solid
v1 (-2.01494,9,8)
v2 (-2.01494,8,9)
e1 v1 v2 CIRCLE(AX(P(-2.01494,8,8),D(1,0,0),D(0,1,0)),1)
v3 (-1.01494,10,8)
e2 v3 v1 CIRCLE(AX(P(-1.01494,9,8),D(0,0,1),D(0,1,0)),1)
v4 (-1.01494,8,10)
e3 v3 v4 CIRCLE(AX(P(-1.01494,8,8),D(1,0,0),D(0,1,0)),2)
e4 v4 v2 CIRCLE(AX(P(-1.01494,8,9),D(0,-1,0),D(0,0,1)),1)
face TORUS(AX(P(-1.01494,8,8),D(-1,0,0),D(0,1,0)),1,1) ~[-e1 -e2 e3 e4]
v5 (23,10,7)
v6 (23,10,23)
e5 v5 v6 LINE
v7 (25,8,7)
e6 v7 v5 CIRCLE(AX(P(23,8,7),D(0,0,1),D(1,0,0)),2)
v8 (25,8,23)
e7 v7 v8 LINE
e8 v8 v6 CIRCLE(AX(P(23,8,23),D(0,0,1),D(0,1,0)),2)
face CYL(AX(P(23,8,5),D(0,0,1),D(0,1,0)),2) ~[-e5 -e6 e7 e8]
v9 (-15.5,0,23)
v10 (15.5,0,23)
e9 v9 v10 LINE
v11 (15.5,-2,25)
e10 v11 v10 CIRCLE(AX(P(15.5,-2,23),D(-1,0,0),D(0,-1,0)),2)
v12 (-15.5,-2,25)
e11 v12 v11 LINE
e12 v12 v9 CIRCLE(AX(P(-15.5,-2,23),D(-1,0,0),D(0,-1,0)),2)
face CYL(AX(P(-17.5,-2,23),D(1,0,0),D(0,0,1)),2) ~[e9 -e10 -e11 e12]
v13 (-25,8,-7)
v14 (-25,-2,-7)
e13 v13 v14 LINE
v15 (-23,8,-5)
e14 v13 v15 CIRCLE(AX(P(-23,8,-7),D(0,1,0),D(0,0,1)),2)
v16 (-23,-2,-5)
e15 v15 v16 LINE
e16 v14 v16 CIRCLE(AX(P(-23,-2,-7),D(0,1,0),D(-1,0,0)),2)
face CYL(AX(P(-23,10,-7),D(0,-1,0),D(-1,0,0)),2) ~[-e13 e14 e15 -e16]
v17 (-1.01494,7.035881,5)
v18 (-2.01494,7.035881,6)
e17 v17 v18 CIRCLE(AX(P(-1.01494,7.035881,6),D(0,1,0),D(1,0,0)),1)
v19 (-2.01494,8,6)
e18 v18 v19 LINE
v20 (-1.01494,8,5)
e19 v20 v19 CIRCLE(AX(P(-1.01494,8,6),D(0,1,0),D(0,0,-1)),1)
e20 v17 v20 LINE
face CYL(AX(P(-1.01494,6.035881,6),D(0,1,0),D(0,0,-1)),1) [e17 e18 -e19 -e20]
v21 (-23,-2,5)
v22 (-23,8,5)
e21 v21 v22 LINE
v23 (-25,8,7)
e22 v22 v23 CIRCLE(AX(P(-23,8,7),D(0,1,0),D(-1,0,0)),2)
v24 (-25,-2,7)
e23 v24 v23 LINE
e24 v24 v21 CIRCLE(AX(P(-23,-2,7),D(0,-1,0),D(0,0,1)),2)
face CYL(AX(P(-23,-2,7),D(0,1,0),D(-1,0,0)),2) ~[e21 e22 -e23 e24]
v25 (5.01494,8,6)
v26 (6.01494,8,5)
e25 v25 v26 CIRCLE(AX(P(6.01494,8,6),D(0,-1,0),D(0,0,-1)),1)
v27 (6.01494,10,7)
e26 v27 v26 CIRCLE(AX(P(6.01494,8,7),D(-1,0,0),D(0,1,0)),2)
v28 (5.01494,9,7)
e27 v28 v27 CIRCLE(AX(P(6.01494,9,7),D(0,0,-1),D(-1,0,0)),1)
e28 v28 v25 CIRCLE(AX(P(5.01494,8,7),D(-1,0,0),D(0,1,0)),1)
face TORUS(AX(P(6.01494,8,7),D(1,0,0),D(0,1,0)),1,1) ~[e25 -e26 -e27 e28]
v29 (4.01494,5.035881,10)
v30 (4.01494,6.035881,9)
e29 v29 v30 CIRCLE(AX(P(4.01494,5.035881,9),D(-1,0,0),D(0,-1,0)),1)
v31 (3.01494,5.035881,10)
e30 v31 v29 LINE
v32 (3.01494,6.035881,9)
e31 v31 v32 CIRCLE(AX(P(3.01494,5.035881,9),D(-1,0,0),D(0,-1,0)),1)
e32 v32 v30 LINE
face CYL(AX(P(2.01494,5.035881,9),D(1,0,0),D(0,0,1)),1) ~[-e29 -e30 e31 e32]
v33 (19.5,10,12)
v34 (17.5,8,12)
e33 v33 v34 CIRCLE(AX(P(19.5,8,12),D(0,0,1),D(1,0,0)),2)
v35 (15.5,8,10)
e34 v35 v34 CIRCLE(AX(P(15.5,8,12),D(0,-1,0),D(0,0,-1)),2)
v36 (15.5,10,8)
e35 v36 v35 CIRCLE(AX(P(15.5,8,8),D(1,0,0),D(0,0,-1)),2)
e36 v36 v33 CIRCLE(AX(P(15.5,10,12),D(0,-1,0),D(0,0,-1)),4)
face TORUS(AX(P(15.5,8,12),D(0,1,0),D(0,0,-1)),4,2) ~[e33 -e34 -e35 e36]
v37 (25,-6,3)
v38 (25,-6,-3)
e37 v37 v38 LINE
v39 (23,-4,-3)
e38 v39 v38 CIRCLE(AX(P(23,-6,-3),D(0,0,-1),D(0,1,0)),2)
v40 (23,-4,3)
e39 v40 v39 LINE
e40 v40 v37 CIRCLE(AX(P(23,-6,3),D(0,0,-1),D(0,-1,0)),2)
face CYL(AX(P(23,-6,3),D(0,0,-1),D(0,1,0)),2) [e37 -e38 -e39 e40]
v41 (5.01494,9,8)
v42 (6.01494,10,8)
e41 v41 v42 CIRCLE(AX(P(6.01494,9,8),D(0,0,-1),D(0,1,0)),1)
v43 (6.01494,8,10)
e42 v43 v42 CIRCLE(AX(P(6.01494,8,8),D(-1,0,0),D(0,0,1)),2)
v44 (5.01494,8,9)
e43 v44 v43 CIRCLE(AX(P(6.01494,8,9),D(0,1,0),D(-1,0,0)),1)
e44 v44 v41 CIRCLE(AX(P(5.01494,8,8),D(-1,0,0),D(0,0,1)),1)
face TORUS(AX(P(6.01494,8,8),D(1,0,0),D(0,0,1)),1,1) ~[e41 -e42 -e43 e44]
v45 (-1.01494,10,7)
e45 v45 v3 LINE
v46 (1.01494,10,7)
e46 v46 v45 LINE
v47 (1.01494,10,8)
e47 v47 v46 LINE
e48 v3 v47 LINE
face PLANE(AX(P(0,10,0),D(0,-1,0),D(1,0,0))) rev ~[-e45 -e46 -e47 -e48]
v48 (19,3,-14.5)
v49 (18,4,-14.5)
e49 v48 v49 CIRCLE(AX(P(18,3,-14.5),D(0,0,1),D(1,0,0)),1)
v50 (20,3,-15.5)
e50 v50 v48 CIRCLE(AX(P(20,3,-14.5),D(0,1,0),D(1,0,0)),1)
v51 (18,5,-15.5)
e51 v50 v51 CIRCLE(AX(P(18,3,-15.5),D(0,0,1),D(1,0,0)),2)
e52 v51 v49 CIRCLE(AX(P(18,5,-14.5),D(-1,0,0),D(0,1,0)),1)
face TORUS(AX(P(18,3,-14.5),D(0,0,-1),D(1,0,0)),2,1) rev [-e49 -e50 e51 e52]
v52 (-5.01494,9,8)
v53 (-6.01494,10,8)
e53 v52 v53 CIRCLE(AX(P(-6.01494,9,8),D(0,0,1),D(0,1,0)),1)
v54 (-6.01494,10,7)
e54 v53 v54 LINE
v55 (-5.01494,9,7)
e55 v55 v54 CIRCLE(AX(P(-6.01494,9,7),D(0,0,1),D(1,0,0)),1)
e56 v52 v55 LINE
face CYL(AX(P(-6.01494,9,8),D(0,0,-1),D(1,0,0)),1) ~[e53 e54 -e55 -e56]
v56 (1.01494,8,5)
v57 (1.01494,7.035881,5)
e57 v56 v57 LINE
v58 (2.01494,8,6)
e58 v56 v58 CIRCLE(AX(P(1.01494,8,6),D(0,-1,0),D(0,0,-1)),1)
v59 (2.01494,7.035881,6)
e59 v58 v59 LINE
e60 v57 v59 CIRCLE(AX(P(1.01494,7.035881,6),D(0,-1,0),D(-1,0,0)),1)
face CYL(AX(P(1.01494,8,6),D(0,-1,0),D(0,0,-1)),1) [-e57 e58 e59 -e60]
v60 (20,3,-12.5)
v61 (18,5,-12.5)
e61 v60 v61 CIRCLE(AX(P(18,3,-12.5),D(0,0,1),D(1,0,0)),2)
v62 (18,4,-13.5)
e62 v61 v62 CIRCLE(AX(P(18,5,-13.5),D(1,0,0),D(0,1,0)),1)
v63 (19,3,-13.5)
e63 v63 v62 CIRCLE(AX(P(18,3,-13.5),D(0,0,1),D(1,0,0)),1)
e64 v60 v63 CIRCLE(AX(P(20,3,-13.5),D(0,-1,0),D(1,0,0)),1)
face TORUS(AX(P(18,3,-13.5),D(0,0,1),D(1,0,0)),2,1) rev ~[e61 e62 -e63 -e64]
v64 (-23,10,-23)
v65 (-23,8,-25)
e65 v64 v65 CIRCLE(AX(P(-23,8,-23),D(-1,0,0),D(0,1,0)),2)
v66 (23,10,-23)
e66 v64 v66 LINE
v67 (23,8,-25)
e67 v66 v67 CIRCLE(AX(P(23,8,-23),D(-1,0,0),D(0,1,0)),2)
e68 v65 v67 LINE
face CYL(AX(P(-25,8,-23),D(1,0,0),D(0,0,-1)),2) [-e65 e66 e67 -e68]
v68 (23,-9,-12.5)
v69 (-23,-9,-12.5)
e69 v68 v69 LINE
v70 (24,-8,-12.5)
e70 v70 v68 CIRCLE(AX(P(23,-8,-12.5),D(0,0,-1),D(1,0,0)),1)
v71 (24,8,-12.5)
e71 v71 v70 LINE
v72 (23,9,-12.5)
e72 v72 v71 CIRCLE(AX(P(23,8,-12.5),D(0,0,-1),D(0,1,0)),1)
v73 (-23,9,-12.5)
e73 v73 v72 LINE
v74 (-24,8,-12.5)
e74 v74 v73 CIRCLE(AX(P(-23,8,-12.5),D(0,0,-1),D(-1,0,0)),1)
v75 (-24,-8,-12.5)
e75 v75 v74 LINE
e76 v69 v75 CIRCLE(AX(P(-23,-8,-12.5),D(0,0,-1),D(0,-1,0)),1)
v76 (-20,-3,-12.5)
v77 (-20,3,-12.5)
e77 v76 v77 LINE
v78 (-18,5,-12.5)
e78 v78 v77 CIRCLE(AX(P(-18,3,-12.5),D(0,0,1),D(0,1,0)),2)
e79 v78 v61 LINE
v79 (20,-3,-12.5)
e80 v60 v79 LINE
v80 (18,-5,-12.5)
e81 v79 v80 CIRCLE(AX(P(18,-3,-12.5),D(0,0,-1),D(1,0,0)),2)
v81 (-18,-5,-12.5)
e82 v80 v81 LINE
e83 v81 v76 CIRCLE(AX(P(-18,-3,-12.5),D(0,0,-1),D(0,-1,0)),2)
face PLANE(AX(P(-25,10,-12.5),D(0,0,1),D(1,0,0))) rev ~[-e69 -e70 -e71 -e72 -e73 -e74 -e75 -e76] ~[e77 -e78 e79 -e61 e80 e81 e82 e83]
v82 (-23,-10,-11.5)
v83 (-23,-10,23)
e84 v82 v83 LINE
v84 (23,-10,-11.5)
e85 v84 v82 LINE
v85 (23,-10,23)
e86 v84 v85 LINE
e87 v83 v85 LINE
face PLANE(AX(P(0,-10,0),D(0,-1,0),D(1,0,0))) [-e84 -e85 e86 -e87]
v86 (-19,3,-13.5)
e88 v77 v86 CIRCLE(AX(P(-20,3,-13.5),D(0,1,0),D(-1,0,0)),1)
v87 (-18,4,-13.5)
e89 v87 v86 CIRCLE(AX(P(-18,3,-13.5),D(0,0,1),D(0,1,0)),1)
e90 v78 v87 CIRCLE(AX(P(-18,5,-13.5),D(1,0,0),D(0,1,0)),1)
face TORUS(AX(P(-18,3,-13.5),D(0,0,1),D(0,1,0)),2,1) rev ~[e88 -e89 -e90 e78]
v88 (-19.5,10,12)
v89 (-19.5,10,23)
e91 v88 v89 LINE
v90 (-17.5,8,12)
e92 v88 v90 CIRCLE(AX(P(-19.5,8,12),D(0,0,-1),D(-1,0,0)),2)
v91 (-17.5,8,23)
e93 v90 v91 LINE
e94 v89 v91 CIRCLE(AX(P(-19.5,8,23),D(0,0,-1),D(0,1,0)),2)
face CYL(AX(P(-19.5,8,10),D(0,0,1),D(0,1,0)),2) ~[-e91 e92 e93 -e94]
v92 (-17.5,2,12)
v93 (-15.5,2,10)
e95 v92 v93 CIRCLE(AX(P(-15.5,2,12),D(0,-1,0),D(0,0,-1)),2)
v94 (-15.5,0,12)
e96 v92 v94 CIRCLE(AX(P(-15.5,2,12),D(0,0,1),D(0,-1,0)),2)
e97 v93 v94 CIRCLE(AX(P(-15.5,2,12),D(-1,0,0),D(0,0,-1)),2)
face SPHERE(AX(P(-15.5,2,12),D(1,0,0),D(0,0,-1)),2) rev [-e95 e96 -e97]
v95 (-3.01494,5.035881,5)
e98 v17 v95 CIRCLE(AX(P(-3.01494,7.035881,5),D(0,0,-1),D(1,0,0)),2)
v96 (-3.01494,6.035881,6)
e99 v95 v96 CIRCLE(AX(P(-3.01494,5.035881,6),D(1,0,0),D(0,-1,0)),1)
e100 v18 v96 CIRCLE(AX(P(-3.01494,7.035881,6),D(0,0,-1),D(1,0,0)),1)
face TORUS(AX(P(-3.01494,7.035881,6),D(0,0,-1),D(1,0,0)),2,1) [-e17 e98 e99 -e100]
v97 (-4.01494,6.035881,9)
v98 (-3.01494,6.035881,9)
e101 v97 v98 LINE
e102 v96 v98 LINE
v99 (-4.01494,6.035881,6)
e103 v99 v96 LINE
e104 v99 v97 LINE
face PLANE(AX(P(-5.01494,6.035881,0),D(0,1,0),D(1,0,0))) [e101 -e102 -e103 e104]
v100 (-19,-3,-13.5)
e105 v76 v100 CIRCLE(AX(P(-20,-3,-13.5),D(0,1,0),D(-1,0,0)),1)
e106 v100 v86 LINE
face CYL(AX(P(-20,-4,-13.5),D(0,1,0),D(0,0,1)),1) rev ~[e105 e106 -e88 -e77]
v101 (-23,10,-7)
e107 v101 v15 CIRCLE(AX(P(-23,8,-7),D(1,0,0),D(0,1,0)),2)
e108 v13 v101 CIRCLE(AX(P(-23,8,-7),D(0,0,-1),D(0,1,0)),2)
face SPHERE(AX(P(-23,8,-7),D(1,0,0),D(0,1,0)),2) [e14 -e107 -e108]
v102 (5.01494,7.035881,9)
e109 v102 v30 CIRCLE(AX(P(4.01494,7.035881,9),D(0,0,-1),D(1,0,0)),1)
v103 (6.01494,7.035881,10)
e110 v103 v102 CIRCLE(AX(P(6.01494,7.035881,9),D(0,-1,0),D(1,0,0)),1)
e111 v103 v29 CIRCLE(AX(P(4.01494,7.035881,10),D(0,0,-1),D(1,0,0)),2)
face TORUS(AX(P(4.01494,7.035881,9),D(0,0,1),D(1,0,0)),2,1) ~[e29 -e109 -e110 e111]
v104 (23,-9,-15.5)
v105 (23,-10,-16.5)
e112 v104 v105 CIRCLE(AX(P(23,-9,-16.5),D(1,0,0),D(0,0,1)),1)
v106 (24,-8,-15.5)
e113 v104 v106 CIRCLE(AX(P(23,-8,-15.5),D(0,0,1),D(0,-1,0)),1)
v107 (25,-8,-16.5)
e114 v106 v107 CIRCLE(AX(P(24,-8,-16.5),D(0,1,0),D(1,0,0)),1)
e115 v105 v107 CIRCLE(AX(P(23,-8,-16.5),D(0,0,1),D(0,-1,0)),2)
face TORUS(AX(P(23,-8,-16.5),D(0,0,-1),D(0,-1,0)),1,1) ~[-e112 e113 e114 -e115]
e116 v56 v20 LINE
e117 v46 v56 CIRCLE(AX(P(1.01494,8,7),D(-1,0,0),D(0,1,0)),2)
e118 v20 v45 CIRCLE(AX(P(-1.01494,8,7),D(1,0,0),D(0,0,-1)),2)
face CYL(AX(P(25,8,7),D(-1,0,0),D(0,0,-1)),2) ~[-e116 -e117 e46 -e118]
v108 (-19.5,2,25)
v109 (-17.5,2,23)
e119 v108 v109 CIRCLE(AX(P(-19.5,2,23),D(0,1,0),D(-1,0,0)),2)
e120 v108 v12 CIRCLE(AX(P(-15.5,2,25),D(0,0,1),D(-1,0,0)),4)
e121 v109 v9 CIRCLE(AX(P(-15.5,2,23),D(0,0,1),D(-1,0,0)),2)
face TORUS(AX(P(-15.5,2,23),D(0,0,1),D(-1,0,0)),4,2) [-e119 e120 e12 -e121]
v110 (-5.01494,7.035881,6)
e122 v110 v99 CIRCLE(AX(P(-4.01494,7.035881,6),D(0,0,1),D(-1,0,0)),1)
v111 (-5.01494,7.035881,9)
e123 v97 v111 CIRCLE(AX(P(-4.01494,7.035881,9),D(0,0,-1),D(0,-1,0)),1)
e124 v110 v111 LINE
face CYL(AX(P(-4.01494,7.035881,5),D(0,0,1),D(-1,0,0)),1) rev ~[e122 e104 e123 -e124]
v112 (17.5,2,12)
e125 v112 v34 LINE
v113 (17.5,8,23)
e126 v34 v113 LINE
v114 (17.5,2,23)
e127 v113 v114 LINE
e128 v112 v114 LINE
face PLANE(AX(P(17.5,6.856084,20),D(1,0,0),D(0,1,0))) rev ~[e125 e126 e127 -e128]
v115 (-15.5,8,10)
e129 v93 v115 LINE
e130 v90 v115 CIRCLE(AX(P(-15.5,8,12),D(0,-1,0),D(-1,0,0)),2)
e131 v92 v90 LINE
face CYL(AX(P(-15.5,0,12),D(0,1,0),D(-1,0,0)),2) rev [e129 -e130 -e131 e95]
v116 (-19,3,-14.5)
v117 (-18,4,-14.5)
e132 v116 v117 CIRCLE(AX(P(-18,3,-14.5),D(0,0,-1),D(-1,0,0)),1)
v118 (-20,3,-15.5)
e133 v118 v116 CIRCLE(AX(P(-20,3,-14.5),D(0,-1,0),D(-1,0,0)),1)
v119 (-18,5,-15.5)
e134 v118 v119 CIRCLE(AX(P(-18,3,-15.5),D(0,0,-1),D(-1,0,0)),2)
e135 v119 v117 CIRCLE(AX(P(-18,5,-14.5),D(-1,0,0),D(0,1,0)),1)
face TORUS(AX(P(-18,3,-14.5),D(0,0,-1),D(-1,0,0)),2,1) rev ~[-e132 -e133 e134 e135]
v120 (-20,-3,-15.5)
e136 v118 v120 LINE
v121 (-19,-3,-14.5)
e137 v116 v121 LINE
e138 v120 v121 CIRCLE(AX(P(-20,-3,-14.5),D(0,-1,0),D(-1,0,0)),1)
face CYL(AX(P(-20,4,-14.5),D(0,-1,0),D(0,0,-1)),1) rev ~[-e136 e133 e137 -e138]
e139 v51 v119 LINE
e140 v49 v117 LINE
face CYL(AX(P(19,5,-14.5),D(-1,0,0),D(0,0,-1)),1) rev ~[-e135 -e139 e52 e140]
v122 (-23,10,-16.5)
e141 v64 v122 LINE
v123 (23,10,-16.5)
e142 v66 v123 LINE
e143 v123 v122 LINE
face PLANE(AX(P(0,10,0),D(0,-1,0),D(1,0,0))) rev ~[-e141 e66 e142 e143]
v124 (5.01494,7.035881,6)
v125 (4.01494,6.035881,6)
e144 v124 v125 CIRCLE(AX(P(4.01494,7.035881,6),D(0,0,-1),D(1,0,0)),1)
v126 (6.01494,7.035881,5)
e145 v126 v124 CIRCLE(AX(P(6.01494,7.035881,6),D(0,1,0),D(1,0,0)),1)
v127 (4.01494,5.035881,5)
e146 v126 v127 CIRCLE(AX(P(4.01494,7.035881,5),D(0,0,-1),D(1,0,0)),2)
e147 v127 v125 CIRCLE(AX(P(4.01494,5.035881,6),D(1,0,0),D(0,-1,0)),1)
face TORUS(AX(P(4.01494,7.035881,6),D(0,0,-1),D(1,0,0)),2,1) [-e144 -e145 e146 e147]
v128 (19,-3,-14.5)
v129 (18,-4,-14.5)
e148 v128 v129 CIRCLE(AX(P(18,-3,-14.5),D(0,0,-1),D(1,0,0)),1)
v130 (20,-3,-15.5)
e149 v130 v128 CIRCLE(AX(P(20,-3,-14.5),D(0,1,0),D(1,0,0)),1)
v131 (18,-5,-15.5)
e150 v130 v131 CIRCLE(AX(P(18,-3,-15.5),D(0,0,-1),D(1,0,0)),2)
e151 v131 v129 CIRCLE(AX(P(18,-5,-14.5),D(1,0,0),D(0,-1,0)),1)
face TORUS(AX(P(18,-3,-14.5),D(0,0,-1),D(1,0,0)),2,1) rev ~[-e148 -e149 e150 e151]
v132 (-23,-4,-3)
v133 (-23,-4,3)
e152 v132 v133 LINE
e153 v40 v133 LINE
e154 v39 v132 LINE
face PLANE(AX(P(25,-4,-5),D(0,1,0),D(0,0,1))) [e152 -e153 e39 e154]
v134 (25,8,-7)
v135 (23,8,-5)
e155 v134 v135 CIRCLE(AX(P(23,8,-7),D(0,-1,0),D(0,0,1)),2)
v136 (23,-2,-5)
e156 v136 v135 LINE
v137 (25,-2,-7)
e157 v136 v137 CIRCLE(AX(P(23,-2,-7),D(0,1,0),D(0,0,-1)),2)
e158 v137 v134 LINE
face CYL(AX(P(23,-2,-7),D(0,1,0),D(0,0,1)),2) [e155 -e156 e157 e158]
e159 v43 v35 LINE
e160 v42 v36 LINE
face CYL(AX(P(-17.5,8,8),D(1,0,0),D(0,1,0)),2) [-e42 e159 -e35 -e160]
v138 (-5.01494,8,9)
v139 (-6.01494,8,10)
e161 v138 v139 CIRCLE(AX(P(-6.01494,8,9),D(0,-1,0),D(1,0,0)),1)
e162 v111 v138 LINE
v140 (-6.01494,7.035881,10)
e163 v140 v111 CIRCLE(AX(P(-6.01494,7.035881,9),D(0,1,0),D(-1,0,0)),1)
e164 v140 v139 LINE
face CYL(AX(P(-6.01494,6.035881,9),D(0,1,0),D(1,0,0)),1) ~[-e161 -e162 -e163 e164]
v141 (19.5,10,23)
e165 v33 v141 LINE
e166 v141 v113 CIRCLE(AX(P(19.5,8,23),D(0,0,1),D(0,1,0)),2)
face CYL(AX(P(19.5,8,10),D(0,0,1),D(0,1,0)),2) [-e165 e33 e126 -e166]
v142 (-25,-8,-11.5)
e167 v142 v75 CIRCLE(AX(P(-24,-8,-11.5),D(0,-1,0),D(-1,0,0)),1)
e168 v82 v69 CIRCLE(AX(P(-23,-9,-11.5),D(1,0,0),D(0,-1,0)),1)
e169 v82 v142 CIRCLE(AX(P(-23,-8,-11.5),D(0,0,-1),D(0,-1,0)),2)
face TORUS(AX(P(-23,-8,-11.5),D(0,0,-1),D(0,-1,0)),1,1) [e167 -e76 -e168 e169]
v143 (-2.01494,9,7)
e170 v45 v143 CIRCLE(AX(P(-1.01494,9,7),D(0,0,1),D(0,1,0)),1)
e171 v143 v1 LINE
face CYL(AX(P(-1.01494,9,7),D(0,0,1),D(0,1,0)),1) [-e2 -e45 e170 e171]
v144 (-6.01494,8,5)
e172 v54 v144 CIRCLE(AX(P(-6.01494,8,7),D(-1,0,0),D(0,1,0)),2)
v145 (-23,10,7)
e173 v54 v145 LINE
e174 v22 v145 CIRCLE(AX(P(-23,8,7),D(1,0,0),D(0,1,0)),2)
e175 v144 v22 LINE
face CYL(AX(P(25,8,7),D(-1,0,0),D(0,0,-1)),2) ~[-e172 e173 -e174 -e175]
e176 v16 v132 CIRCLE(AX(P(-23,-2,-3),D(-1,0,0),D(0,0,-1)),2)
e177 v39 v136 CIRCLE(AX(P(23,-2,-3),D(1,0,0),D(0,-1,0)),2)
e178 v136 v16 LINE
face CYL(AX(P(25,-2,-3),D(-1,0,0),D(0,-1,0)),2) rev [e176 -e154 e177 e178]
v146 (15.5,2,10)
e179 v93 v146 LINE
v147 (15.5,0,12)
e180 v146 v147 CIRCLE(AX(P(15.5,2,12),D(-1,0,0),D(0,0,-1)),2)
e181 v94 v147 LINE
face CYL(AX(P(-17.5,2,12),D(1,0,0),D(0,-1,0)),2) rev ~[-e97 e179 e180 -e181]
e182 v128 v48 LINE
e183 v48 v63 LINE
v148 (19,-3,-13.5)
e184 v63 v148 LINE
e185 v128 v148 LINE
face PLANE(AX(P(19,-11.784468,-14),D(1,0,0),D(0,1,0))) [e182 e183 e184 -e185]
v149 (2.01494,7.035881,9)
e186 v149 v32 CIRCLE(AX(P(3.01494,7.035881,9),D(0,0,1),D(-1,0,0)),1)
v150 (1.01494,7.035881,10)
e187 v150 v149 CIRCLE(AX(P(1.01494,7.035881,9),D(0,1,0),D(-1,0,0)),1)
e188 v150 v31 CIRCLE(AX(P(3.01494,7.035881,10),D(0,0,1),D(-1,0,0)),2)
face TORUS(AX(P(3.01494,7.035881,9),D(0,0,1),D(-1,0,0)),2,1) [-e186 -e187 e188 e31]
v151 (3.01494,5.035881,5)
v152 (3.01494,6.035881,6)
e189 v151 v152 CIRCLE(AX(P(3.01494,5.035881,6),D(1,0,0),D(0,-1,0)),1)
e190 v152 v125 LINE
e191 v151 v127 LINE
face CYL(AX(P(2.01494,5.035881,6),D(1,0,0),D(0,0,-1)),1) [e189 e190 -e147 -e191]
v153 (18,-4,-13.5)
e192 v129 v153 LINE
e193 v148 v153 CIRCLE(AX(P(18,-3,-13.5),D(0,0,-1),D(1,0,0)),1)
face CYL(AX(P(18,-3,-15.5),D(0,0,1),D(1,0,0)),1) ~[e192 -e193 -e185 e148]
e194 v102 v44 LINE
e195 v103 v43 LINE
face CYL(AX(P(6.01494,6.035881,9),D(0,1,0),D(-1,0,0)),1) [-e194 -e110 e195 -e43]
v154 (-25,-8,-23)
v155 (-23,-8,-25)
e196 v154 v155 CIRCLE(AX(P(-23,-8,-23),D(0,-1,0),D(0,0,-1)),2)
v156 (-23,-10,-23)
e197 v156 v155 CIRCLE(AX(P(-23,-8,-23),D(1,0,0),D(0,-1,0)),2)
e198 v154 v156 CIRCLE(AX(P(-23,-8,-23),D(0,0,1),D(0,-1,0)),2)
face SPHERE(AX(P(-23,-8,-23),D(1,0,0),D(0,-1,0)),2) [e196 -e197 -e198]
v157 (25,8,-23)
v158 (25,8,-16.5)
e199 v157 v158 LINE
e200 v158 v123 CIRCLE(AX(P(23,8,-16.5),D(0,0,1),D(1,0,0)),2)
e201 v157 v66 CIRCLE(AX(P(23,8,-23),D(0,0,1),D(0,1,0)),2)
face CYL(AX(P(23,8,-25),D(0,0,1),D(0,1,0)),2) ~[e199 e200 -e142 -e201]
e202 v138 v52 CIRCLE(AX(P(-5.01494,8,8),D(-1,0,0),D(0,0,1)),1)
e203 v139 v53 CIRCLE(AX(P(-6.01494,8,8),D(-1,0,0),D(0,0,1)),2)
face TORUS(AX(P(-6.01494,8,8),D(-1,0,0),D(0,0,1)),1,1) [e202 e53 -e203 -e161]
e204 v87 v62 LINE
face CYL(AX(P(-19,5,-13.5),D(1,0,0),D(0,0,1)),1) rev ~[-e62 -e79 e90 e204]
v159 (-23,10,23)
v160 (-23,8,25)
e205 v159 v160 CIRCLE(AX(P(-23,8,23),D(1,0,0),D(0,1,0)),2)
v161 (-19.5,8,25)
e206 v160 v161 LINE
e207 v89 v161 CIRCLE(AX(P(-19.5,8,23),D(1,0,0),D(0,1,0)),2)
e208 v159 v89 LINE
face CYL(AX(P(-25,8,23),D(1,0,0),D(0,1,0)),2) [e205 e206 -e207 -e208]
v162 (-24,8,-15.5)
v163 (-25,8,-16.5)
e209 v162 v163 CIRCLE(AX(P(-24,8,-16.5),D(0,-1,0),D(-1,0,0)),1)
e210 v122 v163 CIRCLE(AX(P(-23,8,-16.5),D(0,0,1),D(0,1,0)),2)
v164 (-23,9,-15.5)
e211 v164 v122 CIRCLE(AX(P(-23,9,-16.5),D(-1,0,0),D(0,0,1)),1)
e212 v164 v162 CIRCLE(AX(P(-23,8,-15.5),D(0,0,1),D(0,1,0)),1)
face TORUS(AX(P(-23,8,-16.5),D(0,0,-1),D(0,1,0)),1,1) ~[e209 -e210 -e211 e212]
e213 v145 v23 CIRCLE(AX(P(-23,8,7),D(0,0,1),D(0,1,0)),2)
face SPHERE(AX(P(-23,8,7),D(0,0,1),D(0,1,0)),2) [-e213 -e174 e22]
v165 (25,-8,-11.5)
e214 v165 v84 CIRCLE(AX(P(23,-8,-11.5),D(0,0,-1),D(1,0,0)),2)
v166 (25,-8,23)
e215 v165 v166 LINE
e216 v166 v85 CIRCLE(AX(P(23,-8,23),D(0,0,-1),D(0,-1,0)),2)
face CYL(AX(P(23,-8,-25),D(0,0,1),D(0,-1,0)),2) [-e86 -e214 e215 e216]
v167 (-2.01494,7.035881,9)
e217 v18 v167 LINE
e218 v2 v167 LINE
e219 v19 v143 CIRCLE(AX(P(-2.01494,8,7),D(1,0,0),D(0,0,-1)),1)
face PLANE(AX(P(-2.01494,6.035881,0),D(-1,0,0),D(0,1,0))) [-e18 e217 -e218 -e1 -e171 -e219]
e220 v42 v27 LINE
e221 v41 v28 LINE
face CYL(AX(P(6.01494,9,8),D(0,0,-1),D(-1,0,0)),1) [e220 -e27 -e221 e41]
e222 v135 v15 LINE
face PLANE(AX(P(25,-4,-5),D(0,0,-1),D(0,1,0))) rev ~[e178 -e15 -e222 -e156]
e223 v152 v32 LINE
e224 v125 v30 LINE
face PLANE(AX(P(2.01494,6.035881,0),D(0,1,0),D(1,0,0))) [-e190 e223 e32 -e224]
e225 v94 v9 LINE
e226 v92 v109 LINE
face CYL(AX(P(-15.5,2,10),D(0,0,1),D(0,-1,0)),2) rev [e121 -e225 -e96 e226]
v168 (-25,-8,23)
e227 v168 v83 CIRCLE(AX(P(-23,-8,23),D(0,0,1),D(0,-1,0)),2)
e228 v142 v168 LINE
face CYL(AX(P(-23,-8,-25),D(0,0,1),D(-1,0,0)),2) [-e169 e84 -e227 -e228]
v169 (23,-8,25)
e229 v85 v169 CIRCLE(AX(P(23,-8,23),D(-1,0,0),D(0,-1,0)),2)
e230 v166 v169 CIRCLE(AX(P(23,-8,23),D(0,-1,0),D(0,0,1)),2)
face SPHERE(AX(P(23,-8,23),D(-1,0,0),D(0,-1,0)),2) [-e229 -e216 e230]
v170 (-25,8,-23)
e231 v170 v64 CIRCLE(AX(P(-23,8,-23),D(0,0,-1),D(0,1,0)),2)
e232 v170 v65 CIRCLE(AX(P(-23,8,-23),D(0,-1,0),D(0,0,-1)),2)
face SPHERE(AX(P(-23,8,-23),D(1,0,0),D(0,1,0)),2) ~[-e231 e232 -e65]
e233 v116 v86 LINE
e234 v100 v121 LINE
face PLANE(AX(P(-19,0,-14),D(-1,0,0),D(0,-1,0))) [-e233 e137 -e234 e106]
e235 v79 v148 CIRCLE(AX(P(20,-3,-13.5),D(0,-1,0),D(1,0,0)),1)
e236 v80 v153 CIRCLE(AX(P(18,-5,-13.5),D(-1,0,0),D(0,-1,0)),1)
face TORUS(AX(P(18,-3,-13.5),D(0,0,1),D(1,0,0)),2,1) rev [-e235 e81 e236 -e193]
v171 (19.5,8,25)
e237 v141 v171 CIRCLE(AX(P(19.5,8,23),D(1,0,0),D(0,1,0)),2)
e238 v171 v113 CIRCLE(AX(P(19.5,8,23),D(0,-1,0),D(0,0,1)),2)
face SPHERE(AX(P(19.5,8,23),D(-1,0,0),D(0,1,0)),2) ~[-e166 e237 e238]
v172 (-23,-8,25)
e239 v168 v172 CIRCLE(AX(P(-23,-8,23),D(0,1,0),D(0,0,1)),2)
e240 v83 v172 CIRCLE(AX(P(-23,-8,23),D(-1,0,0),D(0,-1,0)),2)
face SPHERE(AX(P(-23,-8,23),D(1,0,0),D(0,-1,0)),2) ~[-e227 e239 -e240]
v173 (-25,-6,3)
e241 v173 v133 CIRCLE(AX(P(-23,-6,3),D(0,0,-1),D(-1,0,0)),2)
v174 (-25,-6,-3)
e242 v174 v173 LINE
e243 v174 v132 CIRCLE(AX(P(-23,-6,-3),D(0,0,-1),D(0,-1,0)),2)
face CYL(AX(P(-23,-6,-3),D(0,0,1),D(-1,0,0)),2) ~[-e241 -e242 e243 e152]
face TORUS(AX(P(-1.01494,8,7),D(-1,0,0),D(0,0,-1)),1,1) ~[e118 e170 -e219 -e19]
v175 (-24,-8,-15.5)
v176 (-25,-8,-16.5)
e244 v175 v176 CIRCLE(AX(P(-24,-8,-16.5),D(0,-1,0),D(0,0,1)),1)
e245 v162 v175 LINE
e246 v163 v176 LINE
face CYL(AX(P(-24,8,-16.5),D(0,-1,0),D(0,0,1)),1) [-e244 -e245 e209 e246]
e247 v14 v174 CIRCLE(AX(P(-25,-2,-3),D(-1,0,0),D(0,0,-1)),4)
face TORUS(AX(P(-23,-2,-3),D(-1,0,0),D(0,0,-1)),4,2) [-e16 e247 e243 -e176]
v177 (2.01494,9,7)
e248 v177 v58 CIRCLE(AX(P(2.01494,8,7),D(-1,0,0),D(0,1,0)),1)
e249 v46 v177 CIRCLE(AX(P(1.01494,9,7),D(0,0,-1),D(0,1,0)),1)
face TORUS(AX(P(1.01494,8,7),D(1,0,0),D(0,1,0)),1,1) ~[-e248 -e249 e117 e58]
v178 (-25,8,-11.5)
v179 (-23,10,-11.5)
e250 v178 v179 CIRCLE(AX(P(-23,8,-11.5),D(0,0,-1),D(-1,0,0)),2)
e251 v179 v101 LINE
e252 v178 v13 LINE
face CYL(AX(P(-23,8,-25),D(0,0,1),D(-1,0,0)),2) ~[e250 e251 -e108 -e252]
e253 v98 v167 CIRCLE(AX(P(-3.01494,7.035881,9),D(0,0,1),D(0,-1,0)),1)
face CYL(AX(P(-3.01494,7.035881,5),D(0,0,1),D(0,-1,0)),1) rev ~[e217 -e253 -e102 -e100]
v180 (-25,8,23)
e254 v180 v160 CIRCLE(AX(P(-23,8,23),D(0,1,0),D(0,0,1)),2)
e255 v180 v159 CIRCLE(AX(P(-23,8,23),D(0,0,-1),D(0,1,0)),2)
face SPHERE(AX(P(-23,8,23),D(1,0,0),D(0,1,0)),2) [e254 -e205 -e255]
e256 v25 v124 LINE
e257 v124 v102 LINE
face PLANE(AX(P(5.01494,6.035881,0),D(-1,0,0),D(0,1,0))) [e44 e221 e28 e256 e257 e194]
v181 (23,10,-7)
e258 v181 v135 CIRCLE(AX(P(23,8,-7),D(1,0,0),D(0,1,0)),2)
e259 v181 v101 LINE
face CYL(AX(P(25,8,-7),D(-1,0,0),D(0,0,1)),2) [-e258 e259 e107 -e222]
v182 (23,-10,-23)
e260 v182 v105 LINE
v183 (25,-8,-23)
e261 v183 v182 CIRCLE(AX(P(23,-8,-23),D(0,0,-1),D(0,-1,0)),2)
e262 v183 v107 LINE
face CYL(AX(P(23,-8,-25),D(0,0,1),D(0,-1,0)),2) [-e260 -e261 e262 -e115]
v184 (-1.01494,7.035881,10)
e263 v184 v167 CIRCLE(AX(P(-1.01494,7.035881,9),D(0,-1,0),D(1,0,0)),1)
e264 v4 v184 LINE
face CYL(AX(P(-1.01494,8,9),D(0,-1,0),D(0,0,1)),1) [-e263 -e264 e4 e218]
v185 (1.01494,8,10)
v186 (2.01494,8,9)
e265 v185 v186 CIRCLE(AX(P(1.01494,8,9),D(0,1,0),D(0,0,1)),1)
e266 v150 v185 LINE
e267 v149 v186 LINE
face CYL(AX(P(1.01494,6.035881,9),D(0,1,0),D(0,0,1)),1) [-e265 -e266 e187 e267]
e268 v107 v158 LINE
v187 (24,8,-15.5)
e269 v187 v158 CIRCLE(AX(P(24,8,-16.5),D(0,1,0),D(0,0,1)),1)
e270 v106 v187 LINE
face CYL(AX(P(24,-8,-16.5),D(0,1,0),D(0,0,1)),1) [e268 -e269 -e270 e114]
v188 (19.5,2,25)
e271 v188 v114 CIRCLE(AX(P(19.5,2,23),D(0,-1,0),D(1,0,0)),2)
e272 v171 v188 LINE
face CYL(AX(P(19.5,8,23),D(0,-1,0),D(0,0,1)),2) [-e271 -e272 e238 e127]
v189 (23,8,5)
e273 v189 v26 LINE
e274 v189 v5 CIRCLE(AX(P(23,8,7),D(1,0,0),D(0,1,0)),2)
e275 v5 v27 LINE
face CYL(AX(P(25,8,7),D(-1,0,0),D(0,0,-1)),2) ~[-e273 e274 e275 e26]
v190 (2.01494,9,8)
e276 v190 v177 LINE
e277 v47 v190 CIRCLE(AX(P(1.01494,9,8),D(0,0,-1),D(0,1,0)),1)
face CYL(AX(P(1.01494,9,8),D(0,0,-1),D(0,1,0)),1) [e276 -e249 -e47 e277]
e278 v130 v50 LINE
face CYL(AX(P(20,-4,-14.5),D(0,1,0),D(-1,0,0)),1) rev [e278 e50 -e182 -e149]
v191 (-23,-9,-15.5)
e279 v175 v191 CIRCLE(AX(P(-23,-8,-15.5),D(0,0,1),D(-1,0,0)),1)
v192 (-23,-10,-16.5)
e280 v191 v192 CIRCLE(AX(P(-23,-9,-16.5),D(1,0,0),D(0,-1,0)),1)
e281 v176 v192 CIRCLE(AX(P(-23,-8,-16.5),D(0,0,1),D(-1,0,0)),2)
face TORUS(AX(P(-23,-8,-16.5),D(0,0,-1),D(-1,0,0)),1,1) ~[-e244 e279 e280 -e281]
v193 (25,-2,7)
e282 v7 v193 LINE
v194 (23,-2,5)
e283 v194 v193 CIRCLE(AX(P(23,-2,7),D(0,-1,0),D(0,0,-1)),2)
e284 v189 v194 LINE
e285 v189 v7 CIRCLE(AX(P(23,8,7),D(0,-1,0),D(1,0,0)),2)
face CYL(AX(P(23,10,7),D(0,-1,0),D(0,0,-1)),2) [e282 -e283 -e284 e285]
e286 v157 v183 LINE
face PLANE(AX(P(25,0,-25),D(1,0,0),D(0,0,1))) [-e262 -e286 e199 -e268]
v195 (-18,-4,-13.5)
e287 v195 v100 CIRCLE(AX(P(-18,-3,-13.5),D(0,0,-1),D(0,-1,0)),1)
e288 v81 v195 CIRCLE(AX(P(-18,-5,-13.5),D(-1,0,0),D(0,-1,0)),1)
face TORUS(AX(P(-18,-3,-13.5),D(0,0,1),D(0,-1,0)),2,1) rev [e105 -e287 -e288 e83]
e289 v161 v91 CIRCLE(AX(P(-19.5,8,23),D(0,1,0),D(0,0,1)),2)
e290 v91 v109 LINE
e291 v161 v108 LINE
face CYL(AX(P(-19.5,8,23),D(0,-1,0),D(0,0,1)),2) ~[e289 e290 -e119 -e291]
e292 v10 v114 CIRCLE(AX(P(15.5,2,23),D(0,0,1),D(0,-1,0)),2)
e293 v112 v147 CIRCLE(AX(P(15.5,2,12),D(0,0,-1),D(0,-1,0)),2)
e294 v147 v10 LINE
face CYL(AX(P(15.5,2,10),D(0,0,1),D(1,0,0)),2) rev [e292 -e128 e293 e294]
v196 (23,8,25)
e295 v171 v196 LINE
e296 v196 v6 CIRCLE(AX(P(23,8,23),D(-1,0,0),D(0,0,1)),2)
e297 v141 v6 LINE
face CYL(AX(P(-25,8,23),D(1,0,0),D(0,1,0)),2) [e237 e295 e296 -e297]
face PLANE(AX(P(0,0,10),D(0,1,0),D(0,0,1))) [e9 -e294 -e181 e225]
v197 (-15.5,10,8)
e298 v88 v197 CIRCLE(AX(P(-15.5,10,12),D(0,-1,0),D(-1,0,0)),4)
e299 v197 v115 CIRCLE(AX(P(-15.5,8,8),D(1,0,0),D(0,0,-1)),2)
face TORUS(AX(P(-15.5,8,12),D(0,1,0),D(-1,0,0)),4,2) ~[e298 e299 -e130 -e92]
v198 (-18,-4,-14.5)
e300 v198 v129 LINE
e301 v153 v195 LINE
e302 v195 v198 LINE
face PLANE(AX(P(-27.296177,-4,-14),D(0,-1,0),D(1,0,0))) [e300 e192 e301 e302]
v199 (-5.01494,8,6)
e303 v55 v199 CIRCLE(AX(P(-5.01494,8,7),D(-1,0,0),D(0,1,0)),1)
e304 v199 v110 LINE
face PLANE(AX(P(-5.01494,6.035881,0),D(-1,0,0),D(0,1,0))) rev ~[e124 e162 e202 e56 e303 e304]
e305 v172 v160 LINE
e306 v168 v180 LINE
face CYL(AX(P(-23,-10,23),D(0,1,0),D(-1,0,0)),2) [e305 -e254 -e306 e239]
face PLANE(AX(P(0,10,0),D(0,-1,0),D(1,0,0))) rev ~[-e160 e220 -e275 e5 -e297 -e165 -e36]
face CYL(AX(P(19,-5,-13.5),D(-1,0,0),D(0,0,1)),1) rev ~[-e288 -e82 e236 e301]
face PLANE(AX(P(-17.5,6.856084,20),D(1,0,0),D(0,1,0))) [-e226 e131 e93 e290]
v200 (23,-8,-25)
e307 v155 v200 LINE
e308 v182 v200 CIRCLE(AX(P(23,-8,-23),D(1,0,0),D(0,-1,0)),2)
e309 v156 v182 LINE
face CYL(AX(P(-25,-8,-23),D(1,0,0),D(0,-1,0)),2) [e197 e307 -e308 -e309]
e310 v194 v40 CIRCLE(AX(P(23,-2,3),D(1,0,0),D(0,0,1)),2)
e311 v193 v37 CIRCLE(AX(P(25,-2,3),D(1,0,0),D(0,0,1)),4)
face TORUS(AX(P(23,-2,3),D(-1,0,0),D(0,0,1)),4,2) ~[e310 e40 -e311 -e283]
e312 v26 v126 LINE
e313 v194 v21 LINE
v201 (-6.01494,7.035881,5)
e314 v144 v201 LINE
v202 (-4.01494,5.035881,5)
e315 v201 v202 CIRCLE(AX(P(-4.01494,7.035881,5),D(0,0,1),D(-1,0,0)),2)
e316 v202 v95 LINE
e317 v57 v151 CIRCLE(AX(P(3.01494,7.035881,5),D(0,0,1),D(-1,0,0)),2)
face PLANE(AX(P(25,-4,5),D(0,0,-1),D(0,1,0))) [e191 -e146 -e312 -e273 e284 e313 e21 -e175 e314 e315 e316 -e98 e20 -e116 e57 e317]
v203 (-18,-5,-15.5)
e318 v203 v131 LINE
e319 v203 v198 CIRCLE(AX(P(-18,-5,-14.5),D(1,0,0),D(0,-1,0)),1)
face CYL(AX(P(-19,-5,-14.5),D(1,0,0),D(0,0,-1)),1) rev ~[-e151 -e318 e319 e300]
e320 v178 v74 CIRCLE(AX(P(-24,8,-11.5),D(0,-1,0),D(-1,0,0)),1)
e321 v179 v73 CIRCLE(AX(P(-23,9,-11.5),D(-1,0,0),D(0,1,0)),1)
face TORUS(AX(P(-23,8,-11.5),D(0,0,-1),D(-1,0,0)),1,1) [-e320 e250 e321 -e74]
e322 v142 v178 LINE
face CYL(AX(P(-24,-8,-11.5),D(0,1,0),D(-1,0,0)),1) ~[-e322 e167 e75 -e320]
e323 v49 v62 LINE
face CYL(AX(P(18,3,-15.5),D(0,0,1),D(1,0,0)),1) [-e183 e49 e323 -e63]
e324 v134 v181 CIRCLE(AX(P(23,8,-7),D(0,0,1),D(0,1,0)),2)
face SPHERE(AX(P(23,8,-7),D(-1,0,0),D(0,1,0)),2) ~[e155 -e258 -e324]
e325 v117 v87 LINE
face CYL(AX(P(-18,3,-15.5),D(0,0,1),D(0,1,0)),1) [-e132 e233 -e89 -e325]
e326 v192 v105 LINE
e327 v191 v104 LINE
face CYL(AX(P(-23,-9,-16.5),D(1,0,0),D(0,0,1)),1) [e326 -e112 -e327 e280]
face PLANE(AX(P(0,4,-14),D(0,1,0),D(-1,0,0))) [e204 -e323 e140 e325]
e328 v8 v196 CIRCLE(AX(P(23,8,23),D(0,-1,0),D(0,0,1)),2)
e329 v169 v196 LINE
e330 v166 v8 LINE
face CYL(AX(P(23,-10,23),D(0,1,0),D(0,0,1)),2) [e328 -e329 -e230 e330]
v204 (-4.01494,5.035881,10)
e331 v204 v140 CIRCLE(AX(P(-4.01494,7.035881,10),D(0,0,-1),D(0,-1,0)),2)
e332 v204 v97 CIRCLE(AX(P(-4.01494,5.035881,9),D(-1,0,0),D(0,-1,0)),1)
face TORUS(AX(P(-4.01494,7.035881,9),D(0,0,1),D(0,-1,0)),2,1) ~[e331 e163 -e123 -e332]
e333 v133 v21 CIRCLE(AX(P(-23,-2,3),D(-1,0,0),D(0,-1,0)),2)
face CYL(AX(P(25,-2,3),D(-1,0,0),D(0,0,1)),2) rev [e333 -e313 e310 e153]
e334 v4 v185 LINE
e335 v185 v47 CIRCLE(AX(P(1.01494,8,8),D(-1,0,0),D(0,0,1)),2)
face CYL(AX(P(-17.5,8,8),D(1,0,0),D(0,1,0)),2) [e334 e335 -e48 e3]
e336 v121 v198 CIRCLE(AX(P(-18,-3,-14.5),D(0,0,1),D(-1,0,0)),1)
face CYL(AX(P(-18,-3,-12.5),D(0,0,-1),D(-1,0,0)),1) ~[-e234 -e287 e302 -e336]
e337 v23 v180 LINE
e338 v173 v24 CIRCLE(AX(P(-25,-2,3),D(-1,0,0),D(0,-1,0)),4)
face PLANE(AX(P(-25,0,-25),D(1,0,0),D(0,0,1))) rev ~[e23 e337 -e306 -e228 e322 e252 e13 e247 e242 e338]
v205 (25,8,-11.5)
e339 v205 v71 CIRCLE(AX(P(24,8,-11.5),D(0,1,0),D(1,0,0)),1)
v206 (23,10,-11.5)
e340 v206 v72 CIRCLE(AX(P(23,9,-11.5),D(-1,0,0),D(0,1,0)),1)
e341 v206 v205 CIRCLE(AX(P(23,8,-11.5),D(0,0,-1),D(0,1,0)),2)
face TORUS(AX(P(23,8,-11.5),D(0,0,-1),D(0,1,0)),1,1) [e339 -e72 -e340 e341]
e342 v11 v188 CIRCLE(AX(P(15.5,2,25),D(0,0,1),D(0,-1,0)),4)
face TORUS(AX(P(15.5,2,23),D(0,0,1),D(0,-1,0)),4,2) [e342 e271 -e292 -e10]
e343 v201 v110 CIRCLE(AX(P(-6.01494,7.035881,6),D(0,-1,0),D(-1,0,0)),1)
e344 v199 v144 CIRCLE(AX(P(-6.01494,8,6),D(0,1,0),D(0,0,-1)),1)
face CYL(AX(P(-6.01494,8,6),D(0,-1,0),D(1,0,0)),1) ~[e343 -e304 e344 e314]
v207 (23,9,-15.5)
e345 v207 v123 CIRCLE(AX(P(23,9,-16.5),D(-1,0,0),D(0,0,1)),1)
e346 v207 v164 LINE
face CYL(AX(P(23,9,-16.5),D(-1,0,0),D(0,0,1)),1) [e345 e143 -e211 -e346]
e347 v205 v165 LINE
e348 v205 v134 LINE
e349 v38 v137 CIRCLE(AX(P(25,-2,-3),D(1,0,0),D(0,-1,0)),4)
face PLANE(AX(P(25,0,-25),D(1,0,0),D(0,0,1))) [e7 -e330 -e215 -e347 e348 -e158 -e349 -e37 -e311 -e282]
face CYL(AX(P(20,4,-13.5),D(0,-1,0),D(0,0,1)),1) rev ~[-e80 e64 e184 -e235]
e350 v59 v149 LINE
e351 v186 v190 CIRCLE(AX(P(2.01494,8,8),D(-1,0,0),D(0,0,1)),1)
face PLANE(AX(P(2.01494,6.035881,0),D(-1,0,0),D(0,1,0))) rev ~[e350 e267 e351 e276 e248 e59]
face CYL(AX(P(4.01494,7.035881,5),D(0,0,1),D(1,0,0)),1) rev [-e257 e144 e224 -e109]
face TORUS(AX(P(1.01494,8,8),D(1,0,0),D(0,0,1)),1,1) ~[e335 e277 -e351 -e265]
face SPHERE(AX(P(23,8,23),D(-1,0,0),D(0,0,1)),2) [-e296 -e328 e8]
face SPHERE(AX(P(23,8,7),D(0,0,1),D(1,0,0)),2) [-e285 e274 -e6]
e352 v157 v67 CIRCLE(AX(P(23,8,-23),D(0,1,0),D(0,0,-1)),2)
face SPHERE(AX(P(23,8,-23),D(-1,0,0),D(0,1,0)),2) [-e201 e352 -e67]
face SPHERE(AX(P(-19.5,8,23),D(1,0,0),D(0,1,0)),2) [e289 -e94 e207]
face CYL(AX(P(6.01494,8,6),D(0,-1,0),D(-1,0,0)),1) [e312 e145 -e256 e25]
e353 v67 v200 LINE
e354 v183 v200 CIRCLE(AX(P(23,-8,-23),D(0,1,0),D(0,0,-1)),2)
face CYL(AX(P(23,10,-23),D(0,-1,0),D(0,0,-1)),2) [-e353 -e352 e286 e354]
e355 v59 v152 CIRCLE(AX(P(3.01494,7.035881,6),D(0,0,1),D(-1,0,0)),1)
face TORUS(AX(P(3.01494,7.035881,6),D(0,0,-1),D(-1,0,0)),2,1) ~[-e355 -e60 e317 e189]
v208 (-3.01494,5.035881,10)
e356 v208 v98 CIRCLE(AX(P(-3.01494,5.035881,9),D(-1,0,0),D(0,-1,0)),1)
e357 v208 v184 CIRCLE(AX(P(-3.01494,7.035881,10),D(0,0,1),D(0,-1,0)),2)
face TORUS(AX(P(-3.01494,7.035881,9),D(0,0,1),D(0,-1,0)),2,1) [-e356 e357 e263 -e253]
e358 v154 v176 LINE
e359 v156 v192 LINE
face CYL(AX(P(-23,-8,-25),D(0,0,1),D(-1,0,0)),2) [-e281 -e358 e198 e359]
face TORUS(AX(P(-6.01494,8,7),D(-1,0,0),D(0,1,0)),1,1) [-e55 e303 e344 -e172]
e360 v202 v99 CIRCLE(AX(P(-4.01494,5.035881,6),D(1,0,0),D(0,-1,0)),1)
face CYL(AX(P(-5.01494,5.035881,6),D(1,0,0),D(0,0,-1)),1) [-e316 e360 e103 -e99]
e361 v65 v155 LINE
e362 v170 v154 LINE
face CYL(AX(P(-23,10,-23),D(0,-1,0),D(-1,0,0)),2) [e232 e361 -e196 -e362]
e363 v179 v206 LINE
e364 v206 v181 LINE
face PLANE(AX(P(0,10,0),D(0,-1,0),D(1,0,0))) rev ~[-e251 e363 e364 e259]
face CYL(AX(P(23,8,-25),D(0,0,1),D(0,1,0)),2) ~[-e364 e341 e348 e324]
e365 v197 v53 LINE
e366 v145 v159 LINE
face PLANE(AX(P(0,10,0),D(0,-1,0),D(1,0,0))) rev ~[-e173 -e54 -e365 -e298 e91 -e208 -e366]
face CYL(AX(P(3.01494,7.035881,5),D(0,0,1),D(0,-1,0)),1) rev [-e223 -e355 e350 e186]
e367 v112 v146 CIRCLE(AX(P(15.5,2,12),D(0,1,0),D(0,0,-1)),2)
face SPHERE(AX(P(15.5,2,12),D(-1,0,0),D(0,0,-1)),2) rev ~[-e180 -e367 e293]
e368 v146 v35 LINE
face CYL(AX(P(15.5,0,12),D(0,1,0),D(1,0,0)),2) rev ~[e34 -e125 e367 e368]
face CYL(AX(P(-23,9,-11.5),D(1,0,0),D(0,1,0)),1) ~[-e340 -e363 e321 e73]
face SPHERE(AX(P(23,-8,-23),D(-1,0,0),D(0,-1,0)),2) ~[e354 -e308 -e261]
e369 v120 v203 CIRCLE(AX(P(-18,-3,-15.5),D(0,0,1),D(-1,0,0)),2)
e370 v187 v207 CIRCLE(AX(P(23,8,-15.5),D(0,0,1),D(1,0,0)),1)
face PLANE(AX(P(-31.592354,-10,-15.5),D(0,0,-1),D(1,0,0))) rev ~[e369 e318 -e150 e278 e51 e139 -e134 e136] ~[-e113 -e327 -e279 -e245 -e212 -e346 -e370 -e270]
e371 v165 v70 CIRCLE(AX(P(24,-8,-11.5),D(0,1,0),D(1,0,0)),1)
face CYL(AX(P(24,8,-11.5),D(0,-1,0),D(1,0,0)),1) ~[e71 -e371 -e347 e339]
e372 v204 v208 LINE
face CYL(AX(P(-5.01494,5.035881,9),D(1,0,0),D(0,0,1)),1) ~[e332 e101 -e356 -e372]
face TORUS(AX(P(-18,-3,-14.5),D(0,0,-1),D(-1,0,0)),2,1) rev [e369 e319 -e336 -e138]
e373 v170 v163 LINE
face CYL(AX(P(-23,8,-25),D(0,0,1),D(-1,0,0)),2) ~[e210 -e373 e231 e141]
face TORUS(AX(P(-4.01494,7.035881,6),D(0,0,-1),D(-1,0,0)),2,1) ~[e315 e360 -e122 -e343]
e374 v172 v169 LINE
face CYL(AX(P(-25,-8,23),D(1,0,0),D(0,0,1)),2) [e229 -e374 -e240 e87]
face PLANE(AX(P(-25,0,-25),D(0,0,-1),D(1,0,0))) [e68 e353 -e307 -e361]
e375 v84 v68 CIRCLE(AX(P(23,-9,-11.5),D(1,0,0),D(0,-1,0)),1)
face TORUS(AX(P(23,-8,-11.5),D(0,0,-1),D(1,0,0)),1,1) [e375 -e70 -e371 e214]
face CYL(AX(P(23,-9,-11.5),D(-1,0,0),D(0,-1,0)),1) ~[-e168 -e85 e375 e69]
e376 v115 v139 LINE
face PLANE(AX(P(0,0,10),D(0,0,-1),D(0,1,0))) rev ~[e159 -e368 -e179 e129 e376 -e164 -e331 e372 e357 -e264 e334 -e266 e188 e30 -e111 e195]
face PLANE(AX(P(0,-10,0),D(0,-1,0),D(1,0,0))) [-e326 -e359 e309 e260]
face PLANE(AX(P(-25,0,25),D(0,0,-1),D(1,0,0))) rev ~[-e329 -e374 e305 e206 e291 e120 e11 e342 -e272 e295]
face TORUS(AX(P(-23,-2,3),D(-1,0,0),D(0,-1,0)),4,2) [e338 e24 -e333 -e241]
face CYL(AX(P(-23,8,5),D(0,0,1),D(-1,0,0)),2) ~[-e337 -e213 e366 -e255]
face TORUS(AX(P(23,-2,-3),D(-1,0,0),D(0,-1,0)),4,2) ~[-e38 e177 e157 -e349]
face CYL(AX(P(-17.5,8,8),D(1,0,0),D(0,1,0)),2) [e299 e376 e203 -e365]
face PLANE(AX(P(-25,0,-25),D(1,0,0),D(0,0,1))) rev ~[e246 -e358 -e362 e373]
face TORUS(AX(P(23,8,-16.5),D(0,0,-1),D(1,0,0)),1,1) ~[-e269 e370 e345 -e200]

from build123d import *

# Parameters (mm, degrees)
F0_W      = 50
F0_H      = 50
F1_DEPTH  = 10
F2_W      = 14
F2_H      = 10
F3_DEPTH  = 76.70555
F4_F1_R   = 2
F4_F2_R   = 2
F5_W      = 13.7121686712
F5_H      = 20
F6_DEPTH  = 17.5
F7_R      = 2
F8_W      = 3
F8_H      = 5.7575751543
F9_DEPTH  = 29.7216
F10_R     = 1
F11_W     = 46
F11_H     = 3
F11_W_2   = 2
F12_DEPTH = 6
F13_W     = 7.5689357519
F13_H     = 3
F13_W_2   = 12
F14_DEPTH = 6
F15_W     = 8.5923536867
F15_H     = 3
F15_W_2   = 42
F16_DEPTH = 6
F17_W     = 8
F17_H     = 3
F18_DEPTH = 6
F19_R     = 1


with BuildPart() as f1:
    # F0 (on Front) → F1 (new body, symmetric)
    with BuildSketch(Plane.XZ):
        Rectangle(F0_W, F0_H)
    extrude(amount=F1_DEPTH, both=True)

    # F2 (on face) → F3 (cut)
    with BuildSketch(Plane.YZ.offset(25)):
        with Locations((3, 0)):
            Rectangle(F2_W, F2_H)
    extrude(amount=-F3_DEPTH, mode=Mode.SUBTRACT)

    # F4: fillet of radius 2 on 20 edges, made by hand

    # F4_f1
    f4_f1_edges = [f1.edges().sort_by_distance(p)[0] for p in [
        (0, -4, -5),
        (0, -4, 5),
    ]]
    fillet(f4_f1_edges, radius=F4_F1_R)

    # F4_f2
    f4_f2_edges = [f1.edges().sort_by_distance(p)[0] for p in [
        (0, 10, 25),
        (0, -10, 25),
        (0, 10, -5),
        (0, 10, -25),
        (0, -10, -25),
        (25, -10, 0),
        (25, 10, -15),
        (-25, 10, -15),
        (-25, -10, 0),
        (-25, 10, 15),
        (-25, 0, 25),
        (25, 0, 25),
        (25, 10, 15),
        (25, 4, -5),
        (0, 10, 5),
        (-25, 4, 5),
        (-25, 0, -25),
        (25, 0, -25),
        (-25, -3.4142135624, 4.4142135624),
        (25, -3.4142135624, -4.4142135624),
    ]]
    fillet(f4_f2_edges, radius=F4_F2_R)

    # F5 (on Right) → F6 (cut, symmetric)
    with BuildSketch(Plane.YZ):
        with Locations((6.8560843356, 20)):
            Rectangle(F5_W, F5_H)
    extrude(amount=F6_DEPTH, both=True, mode=Mode.SUBTRACT)

    # F7
    f7_edges = [f1.edges().sort_by_distance(p)[0] for p in [
        (0, 0, 10),
        (0, 0, 25),
        (17.5, 4, 25),
        (17.5, 5, 10),
        (0, 10, 10),
        (-17.5, 5, 10),
        (-17.5, 0, 17.5),
        (17.5, 0, 17.5),
        (-17.5, 10, 16.5),
        (17.5, 10, 16.5),
        (-17.5, 9.414214, 24.414214),
        (17.5, 9.414214, 24.414214),
    ]]
    fillet(f7_edges, radius=F7_R)

    # F8 (on Top) → F9 (cut)
    with BuildSketch(Plane.XY):
        with Locations((3.5149400131, 8.914668113)):
            Rectangle(F8_W, F8_H)
        with Locations((-3.5149400131, 8.914668113)):
            Rectangle(F8_W, F8_H)
    extrude(amount=F9_DEPTH, mode=Mode.SUBTRACT)

    # F10
    f10_edges = [f1.edges().sort_by_distance(p)[0] for p in [
        (3.51494, 6.035881, 10),
        (2.01494, 6.035881, 7.5),
        (2.01494, 7.01794, 10),
        (-3.51494, 6.035881, 10),
        (-5.01494, 7.01794, 10),
        (3.51494, 6.035881, 5),
        (5.01494, 6.035881, 7.5),
        (5.01494, 9.414214, 5.585786),
        (-2.01494, 7.01794, 5),
        (-3.51494, 6.035881, 5),
        (-2.01494, 6.035881, 7.5),
        (-5.01494, 6.035881, 7.5),
    ]]
    fillet(f10_edges, radius=F10_R)

    # F11 (on face) → F12 (cut)
    with BuildSketch(Plane(origin=(0, 10, 0), x_dir=(-1, 0, 0), z_dir=(0, 1, 0))):
        with Locations((0, -14)):
            Rectangle(F11_W, F11_H)
        with Locations((-24, -14)):
            Rectangle(F11_W_2, F11_H)
        with Locations((24, -14)):
            Rectangle(F11_W_2, F11_H)
    extrude(amount=-F12_DEPTH, mode=Mode.SUBTRACT)

    # F13 (on face) → F14 (cut)
    with BuildSketch(Plane.YZ.offset(25)):
        with Locations((-11.784467876, -14)):
            Rectangle(F13_W, F13_H)
        with Locations((-2, -14)):
            Rectangle(F13_W_2, F13_H)
    extrude(amount=-F14_DEPTH, mode=Mode.SUBTRACT)

    # F15 (on face) → F16 (cut)
    with BuildSketch(Plane.XZ.offset(10)):
        with Locations((-27.2961768433, -14)):
            Rectangle(F15_W, F15_H)
        with Locations((-2, -14)):
            Rectangle(F15_W_2, F15_H)
    extrude(amount=-F16_DEPTH, mode=Mode.SUBTRACT)

    # F17 (on face) → F18 (cut)
    with BuildSketch(Plane(origin=(-25, 0, 0), x_dir=(0, -1, 0), z_dir=(-1, 0, 0))):
        with Locations((0, -14)):
            Rectangle(F17_W, F17_H)
        Polygon((8, -12.5), (4, -12.5), (4, -15.5), (8, -15.5), (13.1623027846, -15.5), (13.1623027846, -12.5), align=None)
    extrude(amount=-F18_DEPTH, mode=Mode.SUBTRACT)

    # F19
    f19_edges = [f1.edges().sort_by_distance(p)[0] for p in [
        (0, 10, -15.5),
        (0, 4, -15.5),
        (19, 0, -12.5),
        (0, 4, -12.5),
        (0, 10, -12.5),
        (24.414214, 9.414214, -12.5),
        (25, 0, -12.5),
        (19, 4, -14),
        (19, 0, -15.5),
        (25, 0, -15.5),
        (24.414214, 9.414214, -15.5),
        (24.414214, -9.414214, -15.5),
        (0, -4, -15.5),
        (0, -10, -15.5),
        (0, -4, -12.5),
        (0, -10, -12.5),
        (-19, 0, -12.5),
        (-25, 0, -12.5),
        (-24.414214, -9.414214, -12.5),
        (-19, -4, -14),
        (-19, 4, -14),
        (-19, 0, -15.5),
        (-24.414214, 9.414214, -15.5),
        (-25, 0, -15.5),
        (-24.414214, -9.414214, -15.5),
        (-24.414214, 9.414214, -12.5),
        (19, -4, -14),
        (24.414214, -9.414214, -12.5),
    ]]
    fillet(f19_edges, radius=F19_R)


solid = f1.part
